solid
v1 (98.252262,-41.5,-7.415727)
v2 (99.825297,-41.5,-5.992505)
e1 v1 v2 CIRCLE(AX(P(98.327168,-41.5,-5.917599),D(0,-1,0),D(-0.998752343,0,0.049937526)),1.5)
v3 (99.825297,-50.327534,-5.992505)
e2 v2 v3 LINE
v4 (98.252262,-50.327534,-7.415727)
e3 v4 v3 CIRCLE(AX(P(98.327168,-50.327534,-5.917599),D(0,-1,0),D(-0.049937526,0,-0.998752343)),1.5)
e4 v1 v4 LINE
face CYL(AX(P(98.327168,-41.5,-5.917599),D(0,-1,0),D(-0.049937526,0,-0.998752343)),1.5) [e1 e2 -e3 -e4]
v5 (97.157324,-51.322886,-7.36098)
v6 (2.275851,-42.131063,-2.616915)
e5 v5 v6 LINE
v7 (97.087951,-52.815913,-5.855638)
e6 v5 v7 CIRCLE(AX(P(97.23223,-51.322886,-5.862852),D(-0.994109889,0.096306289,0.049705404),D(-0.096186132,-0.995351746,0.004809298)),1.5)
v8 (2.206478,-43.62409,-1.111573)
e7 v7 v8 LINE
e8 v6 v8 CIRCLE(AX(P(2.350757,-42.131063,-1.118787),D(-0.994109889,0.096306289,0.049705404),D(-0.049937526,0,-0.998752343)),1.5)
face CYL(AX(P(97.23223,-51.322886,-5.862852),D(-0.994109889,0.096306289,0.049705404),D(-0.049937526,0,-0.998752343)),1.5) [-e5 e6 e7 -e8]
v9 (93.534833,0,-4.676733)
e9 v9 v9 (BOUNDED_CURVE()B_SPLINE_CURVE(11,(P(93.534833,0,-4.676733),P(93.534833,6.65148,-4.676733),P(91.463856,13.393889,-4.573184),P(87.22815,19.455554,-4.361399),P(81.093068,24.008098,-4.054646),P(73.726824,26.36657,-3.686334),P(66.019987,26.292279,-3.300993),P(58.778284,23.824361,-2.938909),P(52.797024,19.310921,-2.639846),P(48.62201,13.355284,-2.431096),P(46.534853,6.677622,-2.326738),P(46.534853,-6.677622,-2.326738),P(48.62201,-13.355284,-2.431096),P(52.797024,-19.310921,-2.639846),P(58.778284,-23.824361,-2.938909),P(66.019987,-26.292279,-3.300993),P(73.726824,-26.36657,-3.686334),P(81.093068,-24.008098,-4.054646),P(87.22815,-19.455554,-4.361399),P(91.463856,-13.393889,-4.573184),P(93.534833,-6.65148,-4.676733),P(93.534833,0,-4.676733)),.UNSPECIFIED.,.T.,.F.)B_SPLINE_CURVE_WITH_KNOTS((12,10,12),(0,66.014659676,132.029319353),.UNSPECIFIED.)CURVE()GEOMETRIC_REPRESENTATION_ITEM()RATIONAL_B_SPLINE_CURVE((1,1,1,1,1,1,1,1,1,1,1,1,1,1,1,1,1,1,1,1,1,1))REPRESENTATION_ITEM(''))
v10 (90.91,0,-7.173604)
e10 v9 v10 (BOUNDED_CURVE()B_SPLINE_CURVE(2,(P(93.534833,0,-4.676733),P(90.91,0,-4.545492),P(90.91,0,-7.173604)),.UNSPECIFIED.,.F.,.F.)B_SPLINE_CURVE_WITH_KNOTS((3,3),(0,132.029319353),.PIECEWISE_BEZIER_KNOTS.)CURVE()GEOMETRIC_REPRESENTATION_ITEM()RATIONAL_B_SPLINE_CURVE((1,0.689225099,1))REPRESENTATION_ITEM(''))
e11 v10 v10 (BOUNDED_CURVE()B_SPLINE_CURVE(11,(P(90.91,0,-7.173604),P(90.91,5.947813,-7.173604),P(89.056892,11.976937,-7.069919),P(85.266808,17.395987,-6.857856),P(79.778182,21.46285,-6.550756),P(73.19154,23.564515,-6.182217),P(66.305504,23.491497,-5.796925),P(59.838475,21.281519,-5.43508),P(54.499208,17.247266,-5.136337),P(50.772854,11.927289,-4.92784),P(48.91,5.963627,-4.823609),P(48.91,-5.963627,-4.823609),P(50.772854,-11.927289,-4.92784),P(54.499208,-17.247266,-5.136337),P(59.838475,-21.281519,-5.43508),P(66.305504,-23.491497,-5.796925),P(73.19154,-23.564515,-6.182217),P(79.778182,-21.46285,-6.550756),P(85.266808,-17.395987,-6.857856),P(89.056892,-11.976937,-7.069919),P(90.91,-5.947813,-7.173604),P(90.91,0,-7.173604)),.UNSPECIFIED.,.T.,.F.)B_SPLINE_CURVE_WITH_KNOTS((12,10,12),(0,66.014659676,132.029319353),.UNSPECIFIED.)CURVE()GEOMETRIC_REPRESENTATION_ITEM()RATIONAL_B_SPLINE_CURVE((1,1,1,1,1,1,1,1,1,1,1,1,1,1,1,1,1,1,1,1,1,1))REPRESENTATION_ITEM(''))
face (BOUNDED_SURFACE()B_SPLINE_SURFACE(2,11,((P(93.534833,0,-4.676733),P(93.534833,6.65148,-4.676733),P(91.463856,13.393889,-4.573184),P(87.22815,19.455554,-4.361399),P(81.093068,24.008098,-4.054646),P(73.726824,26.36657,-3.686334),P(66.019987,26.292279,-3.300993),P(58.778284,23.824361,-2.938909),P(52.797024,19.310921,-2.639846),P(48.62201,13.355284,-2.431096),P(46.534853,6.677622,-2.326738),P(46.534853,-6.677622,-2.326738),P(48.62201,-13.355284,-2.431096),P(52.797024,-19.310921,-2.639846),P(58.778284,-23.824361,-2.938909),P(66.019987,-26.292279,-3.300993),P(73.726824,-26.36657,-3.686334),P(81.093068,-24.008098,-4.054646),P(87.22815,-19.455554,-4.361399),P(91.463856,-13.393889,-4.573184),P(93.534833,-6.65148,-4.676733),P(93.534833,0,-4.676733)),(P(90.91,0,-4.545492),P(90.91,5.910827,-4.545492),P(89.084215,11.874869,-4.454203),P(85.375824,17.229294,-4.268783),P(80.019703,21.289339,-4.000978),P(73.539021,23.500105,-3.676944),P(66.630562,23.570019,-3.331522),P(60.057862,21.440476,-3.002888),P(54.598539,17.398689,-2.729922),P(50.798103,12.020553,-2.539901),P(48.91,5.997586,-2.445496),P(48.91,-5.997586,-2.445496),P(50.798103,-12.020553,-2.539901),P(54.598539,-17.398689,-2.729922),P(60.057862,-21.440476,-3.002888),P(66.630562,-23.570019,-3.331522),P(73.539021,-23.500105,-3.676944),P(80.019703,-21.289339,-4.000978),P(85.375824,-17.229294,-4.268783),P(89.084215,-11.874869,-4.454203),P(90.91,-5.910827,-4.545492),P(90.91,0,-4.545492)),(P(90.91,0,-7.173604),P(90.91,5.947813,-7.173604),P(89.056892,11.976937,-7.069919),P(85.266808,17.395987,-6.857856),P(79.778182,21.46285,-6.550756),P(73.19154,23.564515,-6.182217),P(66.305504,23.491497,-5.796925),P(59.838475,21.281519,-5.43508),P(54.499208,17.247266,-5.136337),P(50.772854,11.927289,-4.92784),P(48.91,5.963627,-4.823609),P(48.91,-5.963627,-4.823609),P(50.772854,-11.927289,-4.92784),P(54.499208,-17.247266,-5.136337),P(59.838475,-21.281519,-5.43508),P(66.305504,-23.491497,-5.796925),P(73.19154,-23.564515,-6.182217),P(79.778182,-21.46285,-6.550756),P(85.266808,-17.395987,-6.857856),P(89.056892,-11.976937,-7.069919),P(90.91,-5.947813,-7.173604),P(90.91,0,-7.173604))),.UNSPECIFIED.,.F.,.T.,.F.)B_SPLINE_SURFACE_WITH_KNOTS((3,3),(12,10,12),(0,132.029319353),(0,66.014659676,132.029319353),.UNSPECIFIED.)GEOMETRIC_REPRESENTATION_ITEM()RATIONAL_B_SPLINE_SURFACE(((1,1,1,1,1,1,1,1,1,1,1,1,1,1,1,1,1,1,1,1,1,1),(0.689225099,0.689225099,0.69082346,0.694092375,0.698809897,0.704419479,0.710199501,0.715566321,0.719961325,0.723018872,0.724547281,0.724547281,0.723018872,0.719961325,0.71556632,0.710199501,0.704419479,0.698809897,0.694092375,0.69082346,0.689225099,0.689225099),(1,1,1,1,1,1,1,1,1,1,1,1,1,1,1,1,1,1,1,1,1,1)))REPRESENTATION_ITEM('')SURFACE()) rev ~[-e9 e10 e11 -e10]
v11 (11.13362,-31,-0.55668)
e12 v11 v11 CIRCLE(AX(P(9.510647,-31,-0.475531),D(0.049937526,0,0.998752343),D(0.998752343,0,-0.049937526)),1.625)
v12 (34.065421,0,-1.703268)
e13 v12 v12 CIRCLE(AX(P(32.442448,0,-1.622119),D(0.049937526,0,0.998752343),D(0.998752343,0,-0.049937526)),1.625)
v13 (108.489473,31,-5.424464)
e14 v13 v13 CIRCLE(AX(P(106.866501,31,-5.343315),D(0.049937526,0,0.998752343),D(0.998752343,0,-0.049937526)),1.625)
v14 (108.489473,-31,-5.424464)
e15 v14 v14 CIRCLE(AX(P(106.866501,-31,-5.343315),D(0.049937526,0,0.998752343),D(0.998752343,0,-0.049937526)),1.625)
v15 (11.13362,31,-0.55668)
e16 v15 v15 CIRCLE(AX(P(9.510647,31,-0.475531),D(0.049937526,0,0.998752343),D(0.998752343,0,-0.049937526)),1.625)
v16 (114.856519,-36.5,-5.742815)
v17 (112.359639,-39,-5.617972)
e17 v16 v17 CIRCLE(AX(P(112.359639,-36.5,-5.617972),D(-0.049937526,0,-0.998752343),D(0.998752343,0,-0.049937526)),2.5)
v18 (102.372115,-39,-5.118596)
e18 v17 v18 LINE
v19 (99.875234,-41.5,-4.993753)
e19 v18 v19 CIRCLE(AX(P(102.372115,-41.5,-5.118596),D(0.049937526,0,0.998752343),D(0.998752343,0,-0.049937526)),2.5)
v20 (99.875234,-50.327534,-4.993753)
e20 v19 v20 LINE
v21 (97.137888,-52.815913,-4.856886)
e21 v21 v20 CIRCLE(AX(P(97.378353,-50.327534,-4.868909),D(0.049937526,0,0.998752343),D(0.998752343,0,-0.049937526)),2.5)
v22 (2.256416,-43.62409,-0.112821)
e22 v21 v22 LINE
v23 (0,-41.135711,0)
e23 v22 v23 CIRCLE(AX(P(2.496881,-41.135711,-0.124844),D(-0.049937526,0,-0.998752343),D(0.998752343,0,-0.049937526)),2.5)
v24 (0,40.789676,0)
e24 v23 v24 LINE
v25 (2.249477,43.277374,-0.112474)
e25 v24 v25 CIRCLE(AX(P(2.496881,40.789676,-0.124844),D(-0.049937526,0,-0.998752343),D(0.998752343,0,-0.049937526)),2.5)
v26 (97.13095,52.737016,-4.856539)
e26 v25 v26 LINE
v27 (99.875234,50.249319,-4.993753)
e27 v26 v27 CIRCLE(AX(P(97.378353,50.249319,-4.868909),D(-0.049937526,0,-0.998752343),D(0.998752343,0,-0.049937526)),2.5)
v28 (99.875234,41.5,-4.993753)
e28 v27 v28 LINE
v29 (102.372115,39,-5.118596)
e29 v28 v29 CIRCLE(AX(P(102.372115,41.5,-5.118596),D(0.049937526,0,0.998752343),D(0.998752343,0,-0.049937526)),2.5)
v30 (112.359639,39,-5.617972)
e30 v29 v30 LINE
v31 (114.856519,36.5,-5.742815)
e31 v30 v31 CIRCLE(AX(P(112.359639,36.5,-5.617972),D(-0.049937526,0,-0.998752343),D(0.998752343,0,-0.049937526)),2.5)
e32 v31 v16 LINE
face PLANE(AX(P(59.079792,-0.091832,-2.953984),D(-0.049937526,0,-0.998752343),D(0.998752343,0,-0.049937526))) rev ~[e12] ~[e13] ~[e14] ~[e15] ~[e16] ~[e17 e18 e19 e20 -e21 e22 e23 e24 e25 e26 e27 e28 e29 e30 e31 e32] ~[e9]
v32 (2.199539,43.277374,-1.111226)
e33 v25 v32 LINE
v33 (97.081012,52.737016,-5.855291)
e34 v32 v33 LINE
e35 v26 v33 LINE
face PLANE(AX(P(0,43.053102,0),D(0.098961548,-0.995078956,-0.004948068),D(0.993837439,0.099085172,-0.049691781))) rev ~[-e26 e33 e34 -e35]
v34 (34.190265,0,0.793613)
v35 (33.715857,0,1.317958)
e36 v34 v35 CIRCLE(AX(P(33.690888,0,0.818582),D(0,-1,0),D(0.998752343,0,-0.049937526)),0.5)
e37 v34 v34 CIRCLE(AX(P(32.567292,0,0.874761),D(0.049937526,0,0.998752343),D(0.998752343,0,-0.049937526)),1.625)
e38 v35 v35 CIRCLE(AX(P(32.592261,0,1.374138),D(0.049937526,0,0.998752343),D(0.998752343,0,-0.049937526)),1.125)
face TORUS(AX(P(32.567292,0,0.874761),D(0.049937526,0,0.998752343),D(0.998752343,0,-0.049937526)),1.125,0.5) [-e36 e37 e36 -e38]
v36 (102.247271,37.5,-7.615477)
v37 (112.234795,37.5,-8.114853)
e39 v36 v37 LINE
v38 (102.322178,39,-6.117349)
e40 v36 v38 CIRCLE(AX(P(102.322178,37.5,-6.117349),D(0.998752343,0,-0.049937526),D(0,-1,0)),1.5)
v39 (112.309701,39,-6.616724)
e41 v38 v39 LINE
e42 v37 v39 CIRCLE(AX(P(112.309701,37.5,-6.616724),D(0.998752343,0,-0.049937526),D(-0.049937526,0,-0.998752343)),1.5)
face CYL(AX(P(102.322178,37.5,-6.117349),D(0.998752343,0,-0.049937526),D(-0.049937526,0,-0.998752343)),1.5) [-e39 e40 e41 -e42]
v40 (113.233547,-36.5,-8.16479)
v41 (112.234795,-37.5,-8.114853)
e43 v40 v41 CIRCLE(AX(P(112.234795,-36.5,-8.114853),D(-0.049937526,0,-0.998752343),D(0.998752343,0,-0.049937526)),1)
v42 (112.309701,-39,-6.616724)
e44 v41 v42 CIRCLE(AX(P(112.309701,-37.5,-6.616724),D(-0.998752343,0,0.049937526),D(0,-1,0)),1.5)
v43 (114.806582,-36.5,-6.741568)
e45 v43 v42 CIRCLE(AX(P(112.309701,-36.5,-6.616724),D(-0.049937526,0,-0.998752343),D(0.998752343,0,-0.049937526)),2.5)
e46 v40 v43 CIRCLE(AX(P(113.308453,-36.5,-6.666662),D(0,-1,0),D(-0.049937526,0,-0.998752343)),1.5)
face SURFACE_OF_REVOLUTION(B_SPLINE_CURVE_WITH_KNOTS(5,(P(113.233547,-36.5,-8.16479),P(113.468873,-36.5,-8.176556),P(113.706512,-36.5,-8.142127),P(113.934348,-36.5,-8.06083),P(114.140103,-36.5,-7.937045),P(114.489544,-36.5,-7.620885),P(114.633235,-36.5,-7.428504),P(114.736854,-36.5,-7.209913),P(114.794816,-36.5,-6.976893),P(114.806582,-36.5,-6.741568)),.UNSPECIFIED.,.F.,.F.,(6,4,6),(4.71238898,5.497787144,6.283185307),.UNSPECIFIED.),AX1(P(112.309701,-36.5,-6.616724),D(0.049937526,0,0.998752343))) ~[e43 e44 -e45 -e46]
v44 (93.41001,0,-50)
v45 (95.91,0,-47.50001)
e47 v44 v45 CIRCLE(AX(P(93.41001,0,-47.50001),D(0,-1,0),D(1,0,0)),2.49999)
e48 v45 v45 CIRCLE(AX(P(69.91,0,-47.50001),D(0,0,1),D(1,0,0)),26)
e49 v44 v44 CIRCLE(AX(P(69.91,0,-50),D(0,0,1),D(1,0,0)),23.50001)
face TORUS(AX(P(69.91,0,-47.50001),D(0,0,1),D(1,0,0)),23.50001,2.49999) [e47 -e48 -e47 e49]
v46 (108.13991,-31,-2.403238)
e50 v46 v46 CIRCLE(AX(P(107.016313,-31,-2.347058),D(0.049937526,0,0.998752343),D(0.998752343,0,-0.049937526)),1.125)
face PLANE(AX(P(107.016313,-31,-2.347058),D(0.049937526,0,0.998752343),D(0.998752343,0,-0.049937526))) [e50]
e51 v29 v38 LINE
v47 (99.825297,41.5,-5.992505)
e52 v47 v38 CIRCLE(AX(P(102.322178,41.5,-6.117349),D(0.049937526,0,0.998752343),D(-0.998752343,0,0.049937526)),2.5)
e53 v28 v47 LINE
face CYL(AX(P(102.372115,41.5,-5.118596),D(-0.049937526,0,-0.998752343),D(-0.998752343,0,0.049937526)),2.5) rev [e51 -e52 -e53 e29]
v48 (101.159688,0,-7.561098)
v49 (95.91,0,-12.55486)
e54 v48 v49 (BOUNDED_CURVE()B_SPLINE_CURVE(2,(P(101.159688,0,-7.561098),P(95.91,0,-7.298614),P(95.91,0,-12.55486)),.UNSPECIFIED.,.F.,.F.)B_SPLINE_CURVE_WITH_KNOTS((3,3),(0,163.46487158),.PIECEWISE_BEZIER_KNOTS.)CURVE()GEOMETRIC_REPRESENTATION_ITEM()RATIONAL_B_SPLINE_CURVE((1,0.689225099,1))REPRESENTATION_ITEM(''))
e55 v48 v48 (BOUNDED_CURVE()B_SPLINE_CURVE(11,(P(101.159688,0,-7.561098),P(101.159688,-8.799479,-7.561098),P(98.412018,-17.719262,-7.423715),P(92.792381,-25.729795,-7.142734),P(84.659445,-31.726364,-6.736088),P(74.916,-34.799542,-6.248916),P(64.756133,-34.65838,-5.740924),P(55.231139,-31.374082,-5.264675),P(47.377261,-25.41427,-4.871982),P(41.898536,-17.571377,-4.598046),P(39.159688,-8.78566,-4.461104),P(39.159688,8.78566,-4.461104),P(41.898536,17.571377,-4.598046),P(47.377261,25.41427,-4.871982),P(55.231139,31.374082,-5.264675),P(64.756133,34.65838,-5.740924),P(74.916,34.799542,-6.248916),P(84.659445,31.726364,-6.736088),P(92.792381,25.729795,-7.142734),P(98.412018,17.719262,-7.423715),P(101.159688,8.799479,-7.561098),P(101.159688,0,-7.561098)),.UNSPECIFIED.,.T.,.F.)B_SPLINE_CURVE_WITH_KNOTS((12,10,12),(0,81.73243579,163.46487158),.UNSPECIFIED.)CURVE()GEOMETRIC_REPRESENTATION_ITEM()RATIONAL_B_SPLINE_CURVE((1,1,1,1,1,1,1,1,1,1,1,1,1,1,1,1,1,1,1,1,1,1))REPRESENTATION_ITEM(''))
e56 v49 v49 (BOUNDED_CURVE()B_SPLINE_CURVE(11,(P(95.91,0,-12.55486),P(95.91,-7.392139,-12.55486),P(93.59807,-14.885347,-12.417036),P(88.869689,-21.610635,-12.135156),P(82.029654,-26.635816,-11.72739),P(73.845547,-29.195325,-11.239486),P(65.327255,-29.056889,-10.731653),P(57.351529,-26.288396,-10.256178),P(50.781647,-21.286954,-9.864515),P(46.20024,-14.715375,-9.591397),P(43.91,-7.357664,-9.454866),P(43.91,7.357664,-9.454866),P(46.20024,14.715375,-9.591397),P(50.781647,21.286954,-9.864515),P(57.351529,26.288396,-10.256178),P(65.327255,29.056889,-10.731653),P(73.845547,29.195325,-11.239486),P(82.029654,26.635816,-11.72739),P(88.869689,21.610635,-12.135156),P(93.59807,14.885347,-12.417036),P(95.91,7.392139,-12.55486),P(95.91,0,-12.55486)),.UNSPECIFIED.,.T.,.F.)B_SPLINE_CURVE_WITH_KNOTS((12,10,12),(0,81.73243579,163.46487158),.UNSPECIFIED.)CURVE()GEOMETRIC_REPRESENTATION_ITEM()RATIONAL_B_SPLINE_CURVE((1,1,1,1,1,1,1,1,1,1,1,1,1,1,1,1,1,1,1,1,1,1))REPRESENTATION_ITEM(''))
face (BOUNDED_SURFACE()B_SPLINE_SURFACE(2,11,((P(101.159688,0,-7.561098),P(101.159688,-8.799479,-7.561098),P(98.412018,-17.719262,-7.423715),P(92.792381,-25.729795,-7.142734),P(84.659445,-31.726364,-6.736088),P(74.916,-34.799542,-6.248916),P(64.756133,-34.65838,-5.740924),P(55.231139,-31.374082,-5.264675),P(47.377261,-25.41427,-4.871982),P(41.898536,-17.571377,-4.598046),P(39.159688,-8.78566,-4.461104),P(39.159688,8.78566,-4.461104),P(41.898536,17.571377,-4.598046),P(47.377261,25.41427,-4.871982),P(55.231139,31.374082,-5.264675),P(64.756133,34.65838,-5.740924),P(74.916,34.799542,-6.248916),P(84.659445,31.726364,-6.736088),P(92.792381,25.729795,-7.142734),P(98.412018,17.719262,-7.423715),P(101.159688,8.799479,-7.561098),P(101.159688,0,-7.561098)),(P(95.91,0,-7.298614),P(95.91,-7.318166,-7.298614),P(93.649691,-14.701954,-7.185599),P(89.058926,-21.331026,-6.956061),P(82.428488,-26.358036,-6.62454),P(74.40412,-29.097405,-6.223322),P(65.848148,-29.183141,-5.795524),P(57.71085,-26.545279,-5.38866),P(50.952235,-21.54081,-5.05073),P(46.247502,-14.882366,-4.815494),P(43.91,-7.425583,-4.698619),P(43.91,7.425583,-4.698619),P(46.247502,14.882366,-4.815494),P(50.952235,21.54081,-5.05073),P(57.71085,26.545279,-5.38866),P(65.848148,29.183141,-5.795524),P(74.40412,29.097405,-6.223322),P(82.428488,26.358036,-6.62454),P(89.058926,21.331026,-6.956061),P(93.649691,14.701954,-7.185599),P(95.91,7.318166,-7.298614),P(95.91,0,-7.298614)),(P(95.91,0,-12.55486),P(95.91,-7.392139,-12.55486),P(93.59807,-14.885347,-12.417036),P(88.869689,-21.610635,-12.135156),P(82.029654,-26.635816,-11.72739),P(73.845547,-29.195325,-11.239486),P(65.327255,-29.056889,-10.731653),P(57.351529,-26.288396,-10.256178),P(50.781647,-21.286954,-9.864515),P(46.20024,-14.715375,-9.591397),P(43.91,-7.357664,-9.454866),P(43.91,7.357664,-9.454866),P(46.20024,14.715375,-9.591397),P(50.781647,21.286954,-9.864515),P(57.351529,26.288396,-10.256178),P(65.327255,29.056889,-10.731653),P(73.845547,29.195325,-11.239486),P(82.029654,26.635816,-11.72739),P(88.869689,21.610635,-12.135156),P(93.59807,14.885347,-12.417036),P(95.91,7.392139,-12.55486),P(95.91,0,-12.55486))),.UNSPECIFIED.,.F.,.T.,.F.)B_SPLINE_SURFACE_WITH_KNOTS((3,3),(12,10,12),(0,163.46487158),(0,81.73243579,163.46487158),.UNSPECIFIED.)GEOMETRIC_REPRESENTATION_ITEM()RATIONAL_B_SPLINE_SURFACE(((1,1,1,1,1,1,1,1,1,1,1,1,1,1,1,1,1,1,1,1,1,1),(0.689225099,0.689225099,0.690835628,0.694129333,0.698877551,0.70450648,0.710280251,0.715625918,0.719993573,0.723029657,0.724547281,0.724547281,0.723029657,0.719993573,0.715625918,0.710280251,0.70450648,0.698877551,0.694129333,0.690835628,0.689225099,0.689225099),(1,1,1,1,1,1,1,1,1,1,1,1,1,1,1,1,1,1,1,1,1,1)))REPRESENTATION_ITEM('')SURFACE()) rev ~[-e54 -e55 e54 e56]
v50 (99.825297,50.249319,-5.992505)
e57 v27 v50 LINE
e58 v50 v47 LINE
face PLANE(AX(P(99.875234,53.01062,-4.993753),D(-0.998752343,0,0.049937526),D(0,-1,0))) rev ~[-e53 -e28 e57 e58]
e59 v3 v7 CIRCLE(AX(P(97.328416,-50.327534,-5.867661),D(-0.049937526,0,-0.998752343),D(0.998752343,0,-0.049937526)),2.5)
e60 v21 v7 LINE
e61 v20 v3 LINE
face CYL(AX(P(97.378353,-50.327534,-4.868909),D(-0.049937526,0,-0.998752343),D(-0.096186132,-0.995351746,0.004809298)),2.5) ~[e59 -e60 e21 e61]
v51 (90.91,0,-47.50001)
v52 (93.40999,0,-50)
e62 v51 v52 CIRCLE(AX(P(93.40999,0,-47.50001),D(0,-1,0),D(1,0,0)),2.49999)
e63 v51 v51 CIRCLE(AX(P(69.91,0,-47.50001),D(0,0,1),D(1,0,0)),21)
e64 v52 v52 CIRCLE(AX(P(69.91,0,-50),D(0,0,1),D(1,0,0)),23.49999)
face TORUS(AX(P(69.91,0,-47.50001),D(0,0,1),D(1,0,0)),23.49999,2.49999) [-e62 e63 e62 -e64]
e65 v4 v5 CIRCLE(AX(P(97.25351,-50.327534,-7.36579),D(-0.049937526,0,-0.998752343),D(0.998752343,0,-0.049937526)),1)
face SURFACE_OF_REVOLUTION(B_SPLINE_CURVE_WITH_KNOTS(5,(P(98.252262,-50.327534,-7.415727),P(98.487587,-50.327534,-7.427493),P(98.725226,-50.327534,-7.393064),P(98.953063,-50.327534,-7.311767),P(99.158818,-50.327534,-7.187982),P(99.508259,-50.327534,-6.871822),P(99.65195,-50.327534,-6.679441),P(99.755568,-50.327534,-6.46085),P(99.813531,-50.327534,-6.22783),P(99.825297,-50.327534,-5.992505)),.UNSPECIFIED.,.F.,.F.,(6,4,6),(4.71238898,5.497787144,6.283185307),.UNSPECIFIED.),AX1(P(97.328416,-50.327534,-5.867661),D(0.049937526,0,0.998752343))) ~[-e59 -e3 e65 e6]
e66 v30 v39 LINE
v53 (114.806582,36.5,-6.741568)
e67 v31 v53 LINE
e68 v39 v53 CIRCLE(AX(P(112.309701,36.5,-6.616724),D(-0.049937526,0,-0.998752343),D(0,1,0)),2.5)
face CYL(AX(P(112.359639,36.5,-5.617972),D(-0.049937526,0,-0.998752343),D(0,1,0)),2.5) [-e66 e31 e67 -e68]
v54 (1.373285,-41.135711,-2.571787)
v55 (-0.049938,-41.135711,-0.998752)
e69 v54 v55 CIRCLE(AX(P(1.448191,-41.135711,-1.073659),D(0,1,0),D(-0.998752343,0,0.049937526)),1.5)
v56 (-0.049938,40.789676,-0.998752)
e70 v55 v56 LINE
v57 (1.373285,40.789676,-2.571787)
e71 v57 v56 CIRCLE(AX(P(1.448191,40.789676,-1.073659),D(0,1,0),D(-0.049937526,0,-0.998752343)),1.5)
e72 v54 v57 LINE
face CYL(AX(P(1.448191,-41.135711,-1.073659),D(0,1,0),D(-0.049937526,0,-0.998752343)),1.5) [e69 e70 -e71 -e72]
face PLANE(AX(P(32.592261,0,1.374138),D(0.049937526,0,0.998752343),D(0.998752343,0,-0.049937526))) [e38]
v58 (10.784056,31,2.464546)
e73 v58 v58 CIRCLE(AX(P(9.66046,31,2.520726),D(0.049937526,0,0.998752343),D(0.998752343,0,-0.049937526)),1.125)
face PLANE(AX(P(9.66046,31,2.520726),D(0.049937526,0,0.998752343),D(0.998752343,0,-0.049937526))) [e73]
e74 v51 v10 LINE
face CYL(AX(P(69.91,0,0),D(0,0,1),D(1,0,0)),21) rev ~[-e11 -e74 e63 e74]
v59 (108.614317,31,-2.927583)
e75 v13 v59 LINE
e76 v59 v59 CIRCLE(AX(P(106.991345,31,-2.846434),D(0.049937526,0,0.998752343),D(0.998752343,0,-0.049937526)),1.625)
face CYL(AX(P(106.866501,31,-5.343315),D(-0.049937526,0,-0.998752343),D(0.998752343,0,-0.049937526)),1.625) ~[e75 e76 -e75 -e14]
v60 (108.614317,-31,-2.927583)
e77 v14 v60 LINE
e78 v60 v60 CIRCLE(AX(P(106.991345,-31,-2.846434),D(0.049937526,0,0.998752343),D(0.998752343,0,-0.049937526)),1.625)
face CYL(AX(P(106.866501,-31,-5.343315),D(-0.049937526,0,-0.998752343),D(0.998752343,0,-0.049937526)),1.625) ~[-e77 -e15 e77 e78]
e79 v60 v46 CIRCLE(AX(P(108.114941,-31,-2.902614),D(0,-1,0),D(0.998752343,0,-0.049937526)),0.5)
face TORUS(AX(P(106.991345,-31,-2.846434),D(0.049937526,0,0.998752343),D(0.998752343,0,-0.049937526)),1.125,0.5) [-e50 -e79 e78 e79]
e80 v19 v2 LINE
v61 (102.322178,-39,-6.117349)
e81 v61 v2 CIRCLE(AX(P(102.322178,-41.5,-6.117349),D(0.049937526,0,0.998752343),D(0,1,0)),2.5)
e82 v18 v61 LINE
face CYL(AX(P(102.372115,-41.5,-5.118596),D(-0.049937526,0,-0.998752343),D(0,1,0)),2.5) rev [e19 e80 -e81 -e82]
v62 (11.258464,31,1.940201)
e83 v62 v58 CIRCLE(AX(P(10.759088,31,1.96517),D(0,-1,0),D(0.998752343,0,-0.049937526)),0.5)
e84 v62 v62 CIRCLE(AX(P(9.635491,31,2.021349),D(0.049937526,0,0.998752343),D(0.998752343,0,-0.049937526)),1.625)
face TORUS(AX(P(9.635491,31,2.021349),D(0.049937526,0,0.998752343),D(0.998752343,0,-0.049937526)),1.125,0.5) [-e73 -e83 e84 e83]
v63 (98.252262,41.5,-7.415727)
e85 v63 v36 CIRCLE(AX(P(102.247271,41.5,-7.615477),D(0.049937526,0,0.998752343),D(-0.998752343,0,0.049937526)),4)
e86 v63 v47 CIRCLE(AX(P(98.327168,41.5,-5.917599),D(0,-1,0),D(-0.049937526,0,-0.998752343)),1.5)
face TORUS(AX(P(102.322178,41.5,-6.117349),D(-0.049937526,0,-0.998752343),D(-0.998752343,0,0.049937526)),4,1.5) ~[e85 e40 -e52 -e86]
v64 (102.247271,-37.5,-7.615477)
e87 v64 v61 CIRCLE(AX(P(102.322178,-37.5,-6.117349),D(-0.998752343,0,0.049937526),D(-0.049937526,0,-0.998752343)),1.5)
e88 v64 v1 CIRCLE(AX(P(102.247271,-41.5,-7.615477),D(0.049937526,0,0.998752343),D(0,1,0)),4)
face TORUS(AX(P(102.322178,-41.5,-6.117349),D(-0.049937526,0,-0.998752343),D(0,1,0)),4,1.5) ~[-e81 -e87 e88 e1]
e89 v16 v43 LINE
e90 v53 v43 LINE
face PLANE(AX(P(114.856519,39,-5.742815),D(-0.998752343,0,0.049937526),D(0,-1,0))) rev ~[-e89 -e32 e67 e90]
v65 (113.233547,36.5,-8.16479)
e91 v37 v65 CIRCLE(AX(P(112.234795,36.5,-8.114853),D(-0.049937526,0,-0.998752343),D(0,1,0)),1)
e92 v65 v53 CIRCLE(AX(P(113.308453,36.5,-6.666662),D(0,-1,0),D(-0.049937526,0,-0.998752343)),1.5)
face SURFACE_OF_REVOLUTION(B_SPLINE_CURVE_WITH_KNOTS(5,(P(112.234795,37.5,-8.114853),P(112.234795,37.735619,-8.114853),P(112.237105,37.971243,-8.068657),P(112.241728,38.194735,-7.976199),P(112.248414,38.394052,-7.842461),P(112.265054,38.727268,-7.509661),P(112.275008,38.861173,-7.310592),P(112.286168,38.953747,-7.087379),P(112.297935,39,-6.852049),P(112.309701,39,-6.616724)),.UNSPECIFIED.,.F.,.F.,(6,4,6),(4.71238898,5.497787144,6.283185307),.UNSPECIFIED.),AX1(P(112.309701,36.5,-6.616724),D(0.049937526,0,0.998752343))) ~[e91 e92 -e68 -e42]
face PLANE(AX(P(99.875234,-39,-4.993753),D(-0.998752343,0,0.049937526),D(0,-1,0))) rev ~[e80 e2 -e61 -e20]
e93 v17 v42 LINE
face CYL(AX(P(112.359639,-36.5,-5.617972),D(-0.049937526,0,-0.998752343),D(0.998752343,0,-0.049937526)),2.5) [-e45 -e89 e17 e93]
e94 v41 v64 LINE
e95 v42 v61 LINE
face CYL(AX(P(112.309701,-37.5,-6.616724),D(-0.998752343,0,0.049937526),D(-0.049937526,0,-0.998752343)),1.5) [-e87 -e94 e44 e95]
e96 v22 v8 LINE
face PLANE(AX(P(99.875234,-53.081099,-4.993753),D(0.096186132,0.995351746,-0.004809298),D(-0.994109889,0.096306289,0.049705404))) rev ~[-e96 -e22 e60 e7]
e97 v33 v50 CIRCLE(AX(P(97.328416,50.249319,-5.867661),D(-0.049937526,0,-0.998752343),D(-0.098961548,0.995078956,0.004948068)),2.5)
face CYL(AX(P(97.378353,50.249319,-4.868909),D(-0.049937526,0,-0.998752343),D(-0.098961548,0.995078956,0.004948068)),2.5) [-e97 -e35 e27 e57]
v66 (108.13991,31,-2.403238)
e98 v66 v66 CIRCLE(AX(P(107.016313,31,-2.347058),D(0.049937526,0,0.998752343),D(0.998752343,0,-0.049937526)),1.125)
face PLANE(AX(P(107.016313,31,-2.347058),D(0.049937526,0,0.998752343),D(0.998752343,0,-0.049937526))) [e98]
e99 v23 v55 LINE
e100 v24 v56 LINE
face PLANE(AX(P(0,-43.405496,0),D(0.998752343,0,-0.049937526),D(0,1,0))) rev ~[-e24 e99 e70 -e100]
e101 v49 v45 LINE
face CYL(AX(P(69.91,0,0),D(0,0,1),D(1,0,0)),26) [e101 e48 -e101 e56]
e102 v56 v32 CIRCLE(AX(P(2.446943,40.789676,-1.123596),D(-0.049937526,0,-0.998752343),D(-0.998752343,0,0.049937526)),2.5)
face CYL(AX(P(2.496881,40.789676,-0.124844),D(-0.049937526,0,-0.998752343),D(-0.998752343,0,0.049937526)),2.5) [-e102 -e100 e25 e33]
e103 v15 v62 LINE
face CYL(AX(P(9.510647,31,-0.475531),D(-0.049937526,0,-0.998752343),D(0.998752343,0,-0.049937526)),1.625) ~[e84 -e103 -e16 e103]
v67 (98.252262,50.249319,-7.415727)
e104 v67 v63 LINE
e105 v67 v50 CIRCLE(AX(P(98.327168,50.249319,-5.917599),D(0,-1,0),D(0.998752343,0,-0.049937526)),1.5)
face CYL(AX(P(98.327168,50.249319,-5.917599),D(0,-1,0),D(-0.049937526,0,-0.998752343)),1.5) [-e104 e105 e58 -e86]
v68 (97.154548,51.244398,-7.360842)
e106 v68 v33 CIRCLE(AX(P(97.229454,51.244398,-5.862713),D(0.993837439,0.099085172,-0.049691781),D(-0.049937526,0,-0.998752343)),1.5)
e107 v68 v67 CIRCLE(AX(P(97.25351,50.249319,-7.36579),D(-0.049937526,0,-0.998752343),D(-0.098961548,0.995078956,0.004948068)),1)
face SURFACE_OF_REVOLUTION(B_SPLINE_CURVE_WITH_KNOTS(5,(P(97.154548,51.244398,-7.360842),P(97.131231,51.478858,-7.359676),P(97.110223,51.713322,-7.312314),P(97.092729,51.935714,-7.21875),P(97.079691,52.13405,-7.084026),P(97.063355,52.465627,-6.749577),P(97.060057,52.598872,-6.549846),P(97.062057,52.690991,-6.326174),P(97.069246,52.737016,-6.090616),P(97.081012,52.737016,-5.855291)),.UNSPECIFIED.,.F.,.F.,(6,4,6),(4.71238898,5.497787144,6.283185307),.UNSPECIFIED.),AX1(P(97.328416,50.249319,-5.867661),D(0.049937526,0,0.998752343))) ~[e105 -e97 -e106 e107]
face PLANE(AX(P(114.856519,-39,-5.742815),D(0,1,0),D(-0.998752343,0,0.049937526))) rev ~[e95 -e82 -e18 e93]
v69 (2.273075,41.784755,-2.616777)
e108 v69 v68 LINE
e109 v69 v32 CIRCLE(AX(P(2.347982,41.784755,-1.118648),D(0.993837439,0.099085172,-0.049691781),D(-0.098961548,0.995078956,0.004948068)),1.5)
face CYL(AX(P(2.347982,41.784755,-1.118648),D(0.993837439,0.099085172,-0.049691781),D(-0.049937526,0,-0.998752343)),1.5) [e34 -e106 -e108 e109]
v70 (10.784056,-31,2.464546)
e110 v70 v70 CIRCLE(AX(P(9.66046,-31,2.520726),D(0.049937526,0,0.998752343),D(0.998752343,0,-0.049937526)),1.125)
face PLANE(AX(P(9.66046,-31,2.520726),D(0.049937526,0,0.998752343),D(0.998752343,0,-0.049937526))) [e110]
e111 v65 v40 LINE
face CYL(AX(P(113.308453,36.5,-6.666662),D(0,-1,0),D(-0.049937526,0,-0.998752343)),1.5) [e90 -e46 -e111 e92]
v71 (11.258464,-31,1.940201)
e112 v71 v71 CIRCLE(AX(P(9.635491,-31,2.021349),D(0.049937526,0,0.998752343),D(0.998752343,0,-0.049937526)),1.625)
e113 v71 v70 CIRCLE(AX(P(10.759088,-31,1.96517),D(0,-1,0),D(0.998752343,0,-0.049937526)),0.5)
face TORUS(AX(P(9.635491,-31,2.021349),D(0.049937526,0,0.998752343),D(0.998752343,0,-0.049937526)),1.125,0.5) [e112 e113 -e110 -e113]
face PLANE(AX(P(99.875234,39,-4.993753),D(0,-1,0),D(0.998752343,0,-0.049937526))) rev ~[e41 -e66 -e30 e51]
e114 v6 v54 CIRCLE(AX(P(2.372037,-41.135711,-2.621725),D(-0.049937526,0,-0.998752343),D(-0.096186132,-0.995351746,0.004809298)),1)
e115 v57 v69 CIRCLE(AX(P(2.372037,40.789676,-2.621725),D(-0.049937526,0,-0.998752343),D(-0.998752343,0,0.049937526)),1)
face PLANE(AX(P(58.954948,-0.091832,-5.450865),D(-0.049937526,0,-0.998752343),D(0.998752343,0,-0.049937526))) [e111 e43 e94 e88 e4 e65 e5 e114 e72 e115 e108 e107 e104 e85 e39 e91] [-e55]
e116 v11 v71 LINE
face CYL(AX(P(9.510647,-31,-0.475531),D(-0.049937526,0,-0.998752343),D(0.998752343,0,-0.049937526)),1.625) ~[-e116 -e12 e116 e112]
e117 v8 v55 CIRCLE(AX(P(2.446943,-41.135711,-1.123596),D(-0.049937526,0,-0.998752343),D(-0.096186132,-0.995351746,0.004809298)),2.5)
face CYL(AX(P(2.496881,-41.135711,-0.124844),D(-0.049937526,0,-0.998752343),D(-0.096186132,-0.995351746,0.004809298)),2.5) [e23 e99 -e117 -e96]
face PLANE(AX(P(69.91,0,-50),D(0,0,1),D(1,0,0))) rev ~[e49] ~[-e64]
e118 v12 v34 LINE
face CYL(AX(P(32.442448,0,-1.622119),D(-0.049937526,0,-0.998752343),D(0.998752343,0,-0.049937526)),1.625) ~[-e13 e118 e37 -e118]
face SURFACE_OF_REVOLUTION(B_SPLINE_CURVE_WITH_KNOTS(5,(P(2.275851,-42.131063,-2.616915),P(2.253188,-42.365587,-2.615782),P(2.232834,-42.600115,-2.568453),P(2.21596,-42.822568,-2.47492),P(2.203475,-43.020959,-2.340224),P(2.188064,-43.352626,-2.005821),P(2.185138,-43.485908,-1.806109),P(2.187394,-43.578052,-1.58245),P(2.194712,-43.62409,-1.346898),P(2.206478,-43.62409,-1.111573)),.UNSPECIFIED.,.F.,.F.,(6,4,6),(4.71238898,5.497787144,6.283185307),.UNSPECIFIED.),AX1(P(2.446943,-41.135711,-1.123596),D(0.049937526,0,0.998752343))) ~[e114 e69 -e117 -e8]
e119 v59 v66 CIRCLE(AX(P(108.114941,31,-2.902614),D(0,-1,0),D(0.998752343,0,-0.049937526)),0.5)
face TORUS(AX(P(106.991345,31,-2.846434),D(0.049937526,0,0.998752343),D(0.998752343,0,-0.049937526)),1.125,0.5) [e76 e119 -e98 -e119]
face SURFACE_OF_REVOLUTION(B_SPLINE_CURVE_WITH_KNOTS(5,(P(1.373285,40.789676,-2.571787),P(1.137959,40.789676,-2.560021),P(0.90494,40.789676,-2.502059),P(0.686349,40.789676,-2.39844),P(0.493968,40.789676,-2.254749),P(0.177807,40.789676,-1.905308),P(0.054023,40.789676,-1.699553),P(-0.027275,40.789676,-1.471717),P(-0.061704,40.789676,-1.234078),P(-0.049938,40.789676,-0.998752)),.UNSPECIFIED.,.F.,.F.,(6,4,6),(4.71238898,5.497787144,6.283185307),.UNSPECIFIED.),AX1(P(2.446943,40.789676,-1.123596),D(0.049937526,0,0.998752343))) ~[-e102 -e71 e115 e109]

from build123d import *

# Parameters (mm, degrees)
F3_DEPTH  = 2.5
F4_R      = 2.5
F5_R      = 1.5
F6_R      = 26
F6_R_2    = 21
F7_DEPTH  = 50
F9_DEPTH  = 10
F11_DEPTH = 17
F12_R     = 2.49999
F13_R     = 5
F14_R     = 1.625
F15_DEPTH = 3
F16_R     = 0.5


# Not quite as in the source:
# - a fillet or chamfer is up to 0.001 mm smaller than in the source, because OpenCascade refuses the exact size


with BuildPart() as f3:
    # F2 (on line) → F3 (new body)
    with BuildSketch(Plane(origin=(0, 0, 0), x_dir=(0.9987523434, 0, -0.0499375258), z_dir=(-0.0499375258, 0, -0.9987523434))):
        Polygon((100, 53.0810991168), (0, 43.405495584), (0, -43.0531017482), (100, -53.0106203496), (100, -39), (115, -39), (115, 39), (100, 39), align=None)
    extrude(amount=F3_DEPTH)

    # F4
    f4_edges = [f3.edges().sort_by_distance(p)[0] for p in [
        (-0.062422, -43.405496, -1.24844),
        (-0.062422, 43.053102, -1.24844),
        (114.794098, 39, -6.991256),
        (99.812812, 53.01062, -6.242193),
        (99.812812, 39, -6.242193),
        (114.794098, -39, -6.991256),
        (99.812812, -53.081099, -6.242193),
        (99.812812, -39, -6.242193),
    ]]
    fillet(f4_edges, radius=F4_R)

    # F5
    f5_edges = [f3.edges().sort_by_distance(p)[0] for p in [
        (114.731676, 0, -8.239696),
        (-0.124844, -0.173017, -2.496881),
        (99.750391, -45.913767, -7.490633),
        (99.750391, 45.874659, -7.490633),
        (49.565369, 48.007195, -4.981387),
        (49.572308, -48.220002, -4.981734),
        (107.241033, -39, -7.865165),
        (107.241033, 39, -7.865165),
    ]]
    fillet(f5_edges, radius=F5_R)


with BuildPart() as f7:
    # F6 (on Top) → F7 (new body)
    with BuildSketch(Plane.XY):
        with Locations((69.91, 0)):
            Circle(F6_R)
        with Locations((69.91, 0)):
            Circle(F6_R_2, mode=Mode.SUBTRACT)
    extrude(amount=-F7_DEPTH)


with BuildPart() as f3_1:
    add(f3.part)

    # F8: union F7
    add(f7.part)

    # F6 (on Top) → F9 (cut)
    with BuildSketch(Plane.XY):
        with Locations((69.91, 0)):
            Circle(F6_R_2)
    extrude(amount=-F9_DEPTH, mode=Mode.SUBTRACT)

    # F10 (on face) → F11 (cut)
    with BuildSketch(Plane(origin=(0, 0, 0), x_dir=(0.9987523434, 0, -0.0499375258), z_dir=(0.0499375258, 0, 0.9987523434))):
        with BuildLine():
            add(Edge.make_bspline(
                [(43.4973326317, 0), (43.4973326317, -45.1440074052), (83.2473326317, -22.5720037026), (122.9973326317, 0), (83.2473326317, 22.5720037026), (43.4973326317, 45.1440074052), (43.4973326317, 0)],
                knots=[0, 0, 0, 2.0943951024, 2.0943951024, 4.1887902048, 4.1887902048, 6.2831853072, 6.2831853072, 6.2831853072], degree=2, weights=[1, 0.5, 1, 0.5, 1, 0.5, 1]))
        make_face()
    extrude(amount=F11_DEPTH, mode=Mode.SUBTRACT)

    # F12 (radius 2.5 in the source; OpenCascade refuses exactly that, so slightly less here)
    f12_edges = [f3_1.edges().sort_by_distance(p)[0] for p in [
        (43.91, 0, -50),
        (48.91, 0, -50),
        (48.91, 0, -2.445496),
    ]]
    fillet(f12_edges, radius=F12_R)

    # F13
    f13_edges = [f3_1.edges().sort_by_distance(p)[0] for p in [
        (43.91, 0, -4.698619),
    ]]
    fillet(f13_edges, radius=F13_R)

    # F14 (on face) → F15 (join)
    with BuildSketch(Plane(origin=(0, 0, 0), x_dir=(0.9987523434, 0, -0.0499375258), z_dir=(0.0499375258, 0, 0.9987523434))):
        with Locations((107, 31)):
            Circle(F14_R)
        with Locations((107, -31)):
            Circle(F14_R)
        with Locations((9.5225282311, 31)):
            Circle(F14_R)
        with Locations((9.5225282311, -31)):
            Circle(F14_R)
        with Locations((32.4829758469, 0)):
            Circle(F14_R)
    extrude(amount=F15_DEPTH)

    # F16
    f16_edges = [f3_1.edges().sort_by_distance(p)[0] for p in [
        (105.393341, 31, -2.26591),
        (105.393341, -31, -2.26591),
        (30.969288, 0, 1.455286),
        (8.037487, 31, 2.601874),
        (8.037487, -31, 2.601874),
    ]]
    fillet(f16_edges, radius=F16_R)


solid = f3_1.part
